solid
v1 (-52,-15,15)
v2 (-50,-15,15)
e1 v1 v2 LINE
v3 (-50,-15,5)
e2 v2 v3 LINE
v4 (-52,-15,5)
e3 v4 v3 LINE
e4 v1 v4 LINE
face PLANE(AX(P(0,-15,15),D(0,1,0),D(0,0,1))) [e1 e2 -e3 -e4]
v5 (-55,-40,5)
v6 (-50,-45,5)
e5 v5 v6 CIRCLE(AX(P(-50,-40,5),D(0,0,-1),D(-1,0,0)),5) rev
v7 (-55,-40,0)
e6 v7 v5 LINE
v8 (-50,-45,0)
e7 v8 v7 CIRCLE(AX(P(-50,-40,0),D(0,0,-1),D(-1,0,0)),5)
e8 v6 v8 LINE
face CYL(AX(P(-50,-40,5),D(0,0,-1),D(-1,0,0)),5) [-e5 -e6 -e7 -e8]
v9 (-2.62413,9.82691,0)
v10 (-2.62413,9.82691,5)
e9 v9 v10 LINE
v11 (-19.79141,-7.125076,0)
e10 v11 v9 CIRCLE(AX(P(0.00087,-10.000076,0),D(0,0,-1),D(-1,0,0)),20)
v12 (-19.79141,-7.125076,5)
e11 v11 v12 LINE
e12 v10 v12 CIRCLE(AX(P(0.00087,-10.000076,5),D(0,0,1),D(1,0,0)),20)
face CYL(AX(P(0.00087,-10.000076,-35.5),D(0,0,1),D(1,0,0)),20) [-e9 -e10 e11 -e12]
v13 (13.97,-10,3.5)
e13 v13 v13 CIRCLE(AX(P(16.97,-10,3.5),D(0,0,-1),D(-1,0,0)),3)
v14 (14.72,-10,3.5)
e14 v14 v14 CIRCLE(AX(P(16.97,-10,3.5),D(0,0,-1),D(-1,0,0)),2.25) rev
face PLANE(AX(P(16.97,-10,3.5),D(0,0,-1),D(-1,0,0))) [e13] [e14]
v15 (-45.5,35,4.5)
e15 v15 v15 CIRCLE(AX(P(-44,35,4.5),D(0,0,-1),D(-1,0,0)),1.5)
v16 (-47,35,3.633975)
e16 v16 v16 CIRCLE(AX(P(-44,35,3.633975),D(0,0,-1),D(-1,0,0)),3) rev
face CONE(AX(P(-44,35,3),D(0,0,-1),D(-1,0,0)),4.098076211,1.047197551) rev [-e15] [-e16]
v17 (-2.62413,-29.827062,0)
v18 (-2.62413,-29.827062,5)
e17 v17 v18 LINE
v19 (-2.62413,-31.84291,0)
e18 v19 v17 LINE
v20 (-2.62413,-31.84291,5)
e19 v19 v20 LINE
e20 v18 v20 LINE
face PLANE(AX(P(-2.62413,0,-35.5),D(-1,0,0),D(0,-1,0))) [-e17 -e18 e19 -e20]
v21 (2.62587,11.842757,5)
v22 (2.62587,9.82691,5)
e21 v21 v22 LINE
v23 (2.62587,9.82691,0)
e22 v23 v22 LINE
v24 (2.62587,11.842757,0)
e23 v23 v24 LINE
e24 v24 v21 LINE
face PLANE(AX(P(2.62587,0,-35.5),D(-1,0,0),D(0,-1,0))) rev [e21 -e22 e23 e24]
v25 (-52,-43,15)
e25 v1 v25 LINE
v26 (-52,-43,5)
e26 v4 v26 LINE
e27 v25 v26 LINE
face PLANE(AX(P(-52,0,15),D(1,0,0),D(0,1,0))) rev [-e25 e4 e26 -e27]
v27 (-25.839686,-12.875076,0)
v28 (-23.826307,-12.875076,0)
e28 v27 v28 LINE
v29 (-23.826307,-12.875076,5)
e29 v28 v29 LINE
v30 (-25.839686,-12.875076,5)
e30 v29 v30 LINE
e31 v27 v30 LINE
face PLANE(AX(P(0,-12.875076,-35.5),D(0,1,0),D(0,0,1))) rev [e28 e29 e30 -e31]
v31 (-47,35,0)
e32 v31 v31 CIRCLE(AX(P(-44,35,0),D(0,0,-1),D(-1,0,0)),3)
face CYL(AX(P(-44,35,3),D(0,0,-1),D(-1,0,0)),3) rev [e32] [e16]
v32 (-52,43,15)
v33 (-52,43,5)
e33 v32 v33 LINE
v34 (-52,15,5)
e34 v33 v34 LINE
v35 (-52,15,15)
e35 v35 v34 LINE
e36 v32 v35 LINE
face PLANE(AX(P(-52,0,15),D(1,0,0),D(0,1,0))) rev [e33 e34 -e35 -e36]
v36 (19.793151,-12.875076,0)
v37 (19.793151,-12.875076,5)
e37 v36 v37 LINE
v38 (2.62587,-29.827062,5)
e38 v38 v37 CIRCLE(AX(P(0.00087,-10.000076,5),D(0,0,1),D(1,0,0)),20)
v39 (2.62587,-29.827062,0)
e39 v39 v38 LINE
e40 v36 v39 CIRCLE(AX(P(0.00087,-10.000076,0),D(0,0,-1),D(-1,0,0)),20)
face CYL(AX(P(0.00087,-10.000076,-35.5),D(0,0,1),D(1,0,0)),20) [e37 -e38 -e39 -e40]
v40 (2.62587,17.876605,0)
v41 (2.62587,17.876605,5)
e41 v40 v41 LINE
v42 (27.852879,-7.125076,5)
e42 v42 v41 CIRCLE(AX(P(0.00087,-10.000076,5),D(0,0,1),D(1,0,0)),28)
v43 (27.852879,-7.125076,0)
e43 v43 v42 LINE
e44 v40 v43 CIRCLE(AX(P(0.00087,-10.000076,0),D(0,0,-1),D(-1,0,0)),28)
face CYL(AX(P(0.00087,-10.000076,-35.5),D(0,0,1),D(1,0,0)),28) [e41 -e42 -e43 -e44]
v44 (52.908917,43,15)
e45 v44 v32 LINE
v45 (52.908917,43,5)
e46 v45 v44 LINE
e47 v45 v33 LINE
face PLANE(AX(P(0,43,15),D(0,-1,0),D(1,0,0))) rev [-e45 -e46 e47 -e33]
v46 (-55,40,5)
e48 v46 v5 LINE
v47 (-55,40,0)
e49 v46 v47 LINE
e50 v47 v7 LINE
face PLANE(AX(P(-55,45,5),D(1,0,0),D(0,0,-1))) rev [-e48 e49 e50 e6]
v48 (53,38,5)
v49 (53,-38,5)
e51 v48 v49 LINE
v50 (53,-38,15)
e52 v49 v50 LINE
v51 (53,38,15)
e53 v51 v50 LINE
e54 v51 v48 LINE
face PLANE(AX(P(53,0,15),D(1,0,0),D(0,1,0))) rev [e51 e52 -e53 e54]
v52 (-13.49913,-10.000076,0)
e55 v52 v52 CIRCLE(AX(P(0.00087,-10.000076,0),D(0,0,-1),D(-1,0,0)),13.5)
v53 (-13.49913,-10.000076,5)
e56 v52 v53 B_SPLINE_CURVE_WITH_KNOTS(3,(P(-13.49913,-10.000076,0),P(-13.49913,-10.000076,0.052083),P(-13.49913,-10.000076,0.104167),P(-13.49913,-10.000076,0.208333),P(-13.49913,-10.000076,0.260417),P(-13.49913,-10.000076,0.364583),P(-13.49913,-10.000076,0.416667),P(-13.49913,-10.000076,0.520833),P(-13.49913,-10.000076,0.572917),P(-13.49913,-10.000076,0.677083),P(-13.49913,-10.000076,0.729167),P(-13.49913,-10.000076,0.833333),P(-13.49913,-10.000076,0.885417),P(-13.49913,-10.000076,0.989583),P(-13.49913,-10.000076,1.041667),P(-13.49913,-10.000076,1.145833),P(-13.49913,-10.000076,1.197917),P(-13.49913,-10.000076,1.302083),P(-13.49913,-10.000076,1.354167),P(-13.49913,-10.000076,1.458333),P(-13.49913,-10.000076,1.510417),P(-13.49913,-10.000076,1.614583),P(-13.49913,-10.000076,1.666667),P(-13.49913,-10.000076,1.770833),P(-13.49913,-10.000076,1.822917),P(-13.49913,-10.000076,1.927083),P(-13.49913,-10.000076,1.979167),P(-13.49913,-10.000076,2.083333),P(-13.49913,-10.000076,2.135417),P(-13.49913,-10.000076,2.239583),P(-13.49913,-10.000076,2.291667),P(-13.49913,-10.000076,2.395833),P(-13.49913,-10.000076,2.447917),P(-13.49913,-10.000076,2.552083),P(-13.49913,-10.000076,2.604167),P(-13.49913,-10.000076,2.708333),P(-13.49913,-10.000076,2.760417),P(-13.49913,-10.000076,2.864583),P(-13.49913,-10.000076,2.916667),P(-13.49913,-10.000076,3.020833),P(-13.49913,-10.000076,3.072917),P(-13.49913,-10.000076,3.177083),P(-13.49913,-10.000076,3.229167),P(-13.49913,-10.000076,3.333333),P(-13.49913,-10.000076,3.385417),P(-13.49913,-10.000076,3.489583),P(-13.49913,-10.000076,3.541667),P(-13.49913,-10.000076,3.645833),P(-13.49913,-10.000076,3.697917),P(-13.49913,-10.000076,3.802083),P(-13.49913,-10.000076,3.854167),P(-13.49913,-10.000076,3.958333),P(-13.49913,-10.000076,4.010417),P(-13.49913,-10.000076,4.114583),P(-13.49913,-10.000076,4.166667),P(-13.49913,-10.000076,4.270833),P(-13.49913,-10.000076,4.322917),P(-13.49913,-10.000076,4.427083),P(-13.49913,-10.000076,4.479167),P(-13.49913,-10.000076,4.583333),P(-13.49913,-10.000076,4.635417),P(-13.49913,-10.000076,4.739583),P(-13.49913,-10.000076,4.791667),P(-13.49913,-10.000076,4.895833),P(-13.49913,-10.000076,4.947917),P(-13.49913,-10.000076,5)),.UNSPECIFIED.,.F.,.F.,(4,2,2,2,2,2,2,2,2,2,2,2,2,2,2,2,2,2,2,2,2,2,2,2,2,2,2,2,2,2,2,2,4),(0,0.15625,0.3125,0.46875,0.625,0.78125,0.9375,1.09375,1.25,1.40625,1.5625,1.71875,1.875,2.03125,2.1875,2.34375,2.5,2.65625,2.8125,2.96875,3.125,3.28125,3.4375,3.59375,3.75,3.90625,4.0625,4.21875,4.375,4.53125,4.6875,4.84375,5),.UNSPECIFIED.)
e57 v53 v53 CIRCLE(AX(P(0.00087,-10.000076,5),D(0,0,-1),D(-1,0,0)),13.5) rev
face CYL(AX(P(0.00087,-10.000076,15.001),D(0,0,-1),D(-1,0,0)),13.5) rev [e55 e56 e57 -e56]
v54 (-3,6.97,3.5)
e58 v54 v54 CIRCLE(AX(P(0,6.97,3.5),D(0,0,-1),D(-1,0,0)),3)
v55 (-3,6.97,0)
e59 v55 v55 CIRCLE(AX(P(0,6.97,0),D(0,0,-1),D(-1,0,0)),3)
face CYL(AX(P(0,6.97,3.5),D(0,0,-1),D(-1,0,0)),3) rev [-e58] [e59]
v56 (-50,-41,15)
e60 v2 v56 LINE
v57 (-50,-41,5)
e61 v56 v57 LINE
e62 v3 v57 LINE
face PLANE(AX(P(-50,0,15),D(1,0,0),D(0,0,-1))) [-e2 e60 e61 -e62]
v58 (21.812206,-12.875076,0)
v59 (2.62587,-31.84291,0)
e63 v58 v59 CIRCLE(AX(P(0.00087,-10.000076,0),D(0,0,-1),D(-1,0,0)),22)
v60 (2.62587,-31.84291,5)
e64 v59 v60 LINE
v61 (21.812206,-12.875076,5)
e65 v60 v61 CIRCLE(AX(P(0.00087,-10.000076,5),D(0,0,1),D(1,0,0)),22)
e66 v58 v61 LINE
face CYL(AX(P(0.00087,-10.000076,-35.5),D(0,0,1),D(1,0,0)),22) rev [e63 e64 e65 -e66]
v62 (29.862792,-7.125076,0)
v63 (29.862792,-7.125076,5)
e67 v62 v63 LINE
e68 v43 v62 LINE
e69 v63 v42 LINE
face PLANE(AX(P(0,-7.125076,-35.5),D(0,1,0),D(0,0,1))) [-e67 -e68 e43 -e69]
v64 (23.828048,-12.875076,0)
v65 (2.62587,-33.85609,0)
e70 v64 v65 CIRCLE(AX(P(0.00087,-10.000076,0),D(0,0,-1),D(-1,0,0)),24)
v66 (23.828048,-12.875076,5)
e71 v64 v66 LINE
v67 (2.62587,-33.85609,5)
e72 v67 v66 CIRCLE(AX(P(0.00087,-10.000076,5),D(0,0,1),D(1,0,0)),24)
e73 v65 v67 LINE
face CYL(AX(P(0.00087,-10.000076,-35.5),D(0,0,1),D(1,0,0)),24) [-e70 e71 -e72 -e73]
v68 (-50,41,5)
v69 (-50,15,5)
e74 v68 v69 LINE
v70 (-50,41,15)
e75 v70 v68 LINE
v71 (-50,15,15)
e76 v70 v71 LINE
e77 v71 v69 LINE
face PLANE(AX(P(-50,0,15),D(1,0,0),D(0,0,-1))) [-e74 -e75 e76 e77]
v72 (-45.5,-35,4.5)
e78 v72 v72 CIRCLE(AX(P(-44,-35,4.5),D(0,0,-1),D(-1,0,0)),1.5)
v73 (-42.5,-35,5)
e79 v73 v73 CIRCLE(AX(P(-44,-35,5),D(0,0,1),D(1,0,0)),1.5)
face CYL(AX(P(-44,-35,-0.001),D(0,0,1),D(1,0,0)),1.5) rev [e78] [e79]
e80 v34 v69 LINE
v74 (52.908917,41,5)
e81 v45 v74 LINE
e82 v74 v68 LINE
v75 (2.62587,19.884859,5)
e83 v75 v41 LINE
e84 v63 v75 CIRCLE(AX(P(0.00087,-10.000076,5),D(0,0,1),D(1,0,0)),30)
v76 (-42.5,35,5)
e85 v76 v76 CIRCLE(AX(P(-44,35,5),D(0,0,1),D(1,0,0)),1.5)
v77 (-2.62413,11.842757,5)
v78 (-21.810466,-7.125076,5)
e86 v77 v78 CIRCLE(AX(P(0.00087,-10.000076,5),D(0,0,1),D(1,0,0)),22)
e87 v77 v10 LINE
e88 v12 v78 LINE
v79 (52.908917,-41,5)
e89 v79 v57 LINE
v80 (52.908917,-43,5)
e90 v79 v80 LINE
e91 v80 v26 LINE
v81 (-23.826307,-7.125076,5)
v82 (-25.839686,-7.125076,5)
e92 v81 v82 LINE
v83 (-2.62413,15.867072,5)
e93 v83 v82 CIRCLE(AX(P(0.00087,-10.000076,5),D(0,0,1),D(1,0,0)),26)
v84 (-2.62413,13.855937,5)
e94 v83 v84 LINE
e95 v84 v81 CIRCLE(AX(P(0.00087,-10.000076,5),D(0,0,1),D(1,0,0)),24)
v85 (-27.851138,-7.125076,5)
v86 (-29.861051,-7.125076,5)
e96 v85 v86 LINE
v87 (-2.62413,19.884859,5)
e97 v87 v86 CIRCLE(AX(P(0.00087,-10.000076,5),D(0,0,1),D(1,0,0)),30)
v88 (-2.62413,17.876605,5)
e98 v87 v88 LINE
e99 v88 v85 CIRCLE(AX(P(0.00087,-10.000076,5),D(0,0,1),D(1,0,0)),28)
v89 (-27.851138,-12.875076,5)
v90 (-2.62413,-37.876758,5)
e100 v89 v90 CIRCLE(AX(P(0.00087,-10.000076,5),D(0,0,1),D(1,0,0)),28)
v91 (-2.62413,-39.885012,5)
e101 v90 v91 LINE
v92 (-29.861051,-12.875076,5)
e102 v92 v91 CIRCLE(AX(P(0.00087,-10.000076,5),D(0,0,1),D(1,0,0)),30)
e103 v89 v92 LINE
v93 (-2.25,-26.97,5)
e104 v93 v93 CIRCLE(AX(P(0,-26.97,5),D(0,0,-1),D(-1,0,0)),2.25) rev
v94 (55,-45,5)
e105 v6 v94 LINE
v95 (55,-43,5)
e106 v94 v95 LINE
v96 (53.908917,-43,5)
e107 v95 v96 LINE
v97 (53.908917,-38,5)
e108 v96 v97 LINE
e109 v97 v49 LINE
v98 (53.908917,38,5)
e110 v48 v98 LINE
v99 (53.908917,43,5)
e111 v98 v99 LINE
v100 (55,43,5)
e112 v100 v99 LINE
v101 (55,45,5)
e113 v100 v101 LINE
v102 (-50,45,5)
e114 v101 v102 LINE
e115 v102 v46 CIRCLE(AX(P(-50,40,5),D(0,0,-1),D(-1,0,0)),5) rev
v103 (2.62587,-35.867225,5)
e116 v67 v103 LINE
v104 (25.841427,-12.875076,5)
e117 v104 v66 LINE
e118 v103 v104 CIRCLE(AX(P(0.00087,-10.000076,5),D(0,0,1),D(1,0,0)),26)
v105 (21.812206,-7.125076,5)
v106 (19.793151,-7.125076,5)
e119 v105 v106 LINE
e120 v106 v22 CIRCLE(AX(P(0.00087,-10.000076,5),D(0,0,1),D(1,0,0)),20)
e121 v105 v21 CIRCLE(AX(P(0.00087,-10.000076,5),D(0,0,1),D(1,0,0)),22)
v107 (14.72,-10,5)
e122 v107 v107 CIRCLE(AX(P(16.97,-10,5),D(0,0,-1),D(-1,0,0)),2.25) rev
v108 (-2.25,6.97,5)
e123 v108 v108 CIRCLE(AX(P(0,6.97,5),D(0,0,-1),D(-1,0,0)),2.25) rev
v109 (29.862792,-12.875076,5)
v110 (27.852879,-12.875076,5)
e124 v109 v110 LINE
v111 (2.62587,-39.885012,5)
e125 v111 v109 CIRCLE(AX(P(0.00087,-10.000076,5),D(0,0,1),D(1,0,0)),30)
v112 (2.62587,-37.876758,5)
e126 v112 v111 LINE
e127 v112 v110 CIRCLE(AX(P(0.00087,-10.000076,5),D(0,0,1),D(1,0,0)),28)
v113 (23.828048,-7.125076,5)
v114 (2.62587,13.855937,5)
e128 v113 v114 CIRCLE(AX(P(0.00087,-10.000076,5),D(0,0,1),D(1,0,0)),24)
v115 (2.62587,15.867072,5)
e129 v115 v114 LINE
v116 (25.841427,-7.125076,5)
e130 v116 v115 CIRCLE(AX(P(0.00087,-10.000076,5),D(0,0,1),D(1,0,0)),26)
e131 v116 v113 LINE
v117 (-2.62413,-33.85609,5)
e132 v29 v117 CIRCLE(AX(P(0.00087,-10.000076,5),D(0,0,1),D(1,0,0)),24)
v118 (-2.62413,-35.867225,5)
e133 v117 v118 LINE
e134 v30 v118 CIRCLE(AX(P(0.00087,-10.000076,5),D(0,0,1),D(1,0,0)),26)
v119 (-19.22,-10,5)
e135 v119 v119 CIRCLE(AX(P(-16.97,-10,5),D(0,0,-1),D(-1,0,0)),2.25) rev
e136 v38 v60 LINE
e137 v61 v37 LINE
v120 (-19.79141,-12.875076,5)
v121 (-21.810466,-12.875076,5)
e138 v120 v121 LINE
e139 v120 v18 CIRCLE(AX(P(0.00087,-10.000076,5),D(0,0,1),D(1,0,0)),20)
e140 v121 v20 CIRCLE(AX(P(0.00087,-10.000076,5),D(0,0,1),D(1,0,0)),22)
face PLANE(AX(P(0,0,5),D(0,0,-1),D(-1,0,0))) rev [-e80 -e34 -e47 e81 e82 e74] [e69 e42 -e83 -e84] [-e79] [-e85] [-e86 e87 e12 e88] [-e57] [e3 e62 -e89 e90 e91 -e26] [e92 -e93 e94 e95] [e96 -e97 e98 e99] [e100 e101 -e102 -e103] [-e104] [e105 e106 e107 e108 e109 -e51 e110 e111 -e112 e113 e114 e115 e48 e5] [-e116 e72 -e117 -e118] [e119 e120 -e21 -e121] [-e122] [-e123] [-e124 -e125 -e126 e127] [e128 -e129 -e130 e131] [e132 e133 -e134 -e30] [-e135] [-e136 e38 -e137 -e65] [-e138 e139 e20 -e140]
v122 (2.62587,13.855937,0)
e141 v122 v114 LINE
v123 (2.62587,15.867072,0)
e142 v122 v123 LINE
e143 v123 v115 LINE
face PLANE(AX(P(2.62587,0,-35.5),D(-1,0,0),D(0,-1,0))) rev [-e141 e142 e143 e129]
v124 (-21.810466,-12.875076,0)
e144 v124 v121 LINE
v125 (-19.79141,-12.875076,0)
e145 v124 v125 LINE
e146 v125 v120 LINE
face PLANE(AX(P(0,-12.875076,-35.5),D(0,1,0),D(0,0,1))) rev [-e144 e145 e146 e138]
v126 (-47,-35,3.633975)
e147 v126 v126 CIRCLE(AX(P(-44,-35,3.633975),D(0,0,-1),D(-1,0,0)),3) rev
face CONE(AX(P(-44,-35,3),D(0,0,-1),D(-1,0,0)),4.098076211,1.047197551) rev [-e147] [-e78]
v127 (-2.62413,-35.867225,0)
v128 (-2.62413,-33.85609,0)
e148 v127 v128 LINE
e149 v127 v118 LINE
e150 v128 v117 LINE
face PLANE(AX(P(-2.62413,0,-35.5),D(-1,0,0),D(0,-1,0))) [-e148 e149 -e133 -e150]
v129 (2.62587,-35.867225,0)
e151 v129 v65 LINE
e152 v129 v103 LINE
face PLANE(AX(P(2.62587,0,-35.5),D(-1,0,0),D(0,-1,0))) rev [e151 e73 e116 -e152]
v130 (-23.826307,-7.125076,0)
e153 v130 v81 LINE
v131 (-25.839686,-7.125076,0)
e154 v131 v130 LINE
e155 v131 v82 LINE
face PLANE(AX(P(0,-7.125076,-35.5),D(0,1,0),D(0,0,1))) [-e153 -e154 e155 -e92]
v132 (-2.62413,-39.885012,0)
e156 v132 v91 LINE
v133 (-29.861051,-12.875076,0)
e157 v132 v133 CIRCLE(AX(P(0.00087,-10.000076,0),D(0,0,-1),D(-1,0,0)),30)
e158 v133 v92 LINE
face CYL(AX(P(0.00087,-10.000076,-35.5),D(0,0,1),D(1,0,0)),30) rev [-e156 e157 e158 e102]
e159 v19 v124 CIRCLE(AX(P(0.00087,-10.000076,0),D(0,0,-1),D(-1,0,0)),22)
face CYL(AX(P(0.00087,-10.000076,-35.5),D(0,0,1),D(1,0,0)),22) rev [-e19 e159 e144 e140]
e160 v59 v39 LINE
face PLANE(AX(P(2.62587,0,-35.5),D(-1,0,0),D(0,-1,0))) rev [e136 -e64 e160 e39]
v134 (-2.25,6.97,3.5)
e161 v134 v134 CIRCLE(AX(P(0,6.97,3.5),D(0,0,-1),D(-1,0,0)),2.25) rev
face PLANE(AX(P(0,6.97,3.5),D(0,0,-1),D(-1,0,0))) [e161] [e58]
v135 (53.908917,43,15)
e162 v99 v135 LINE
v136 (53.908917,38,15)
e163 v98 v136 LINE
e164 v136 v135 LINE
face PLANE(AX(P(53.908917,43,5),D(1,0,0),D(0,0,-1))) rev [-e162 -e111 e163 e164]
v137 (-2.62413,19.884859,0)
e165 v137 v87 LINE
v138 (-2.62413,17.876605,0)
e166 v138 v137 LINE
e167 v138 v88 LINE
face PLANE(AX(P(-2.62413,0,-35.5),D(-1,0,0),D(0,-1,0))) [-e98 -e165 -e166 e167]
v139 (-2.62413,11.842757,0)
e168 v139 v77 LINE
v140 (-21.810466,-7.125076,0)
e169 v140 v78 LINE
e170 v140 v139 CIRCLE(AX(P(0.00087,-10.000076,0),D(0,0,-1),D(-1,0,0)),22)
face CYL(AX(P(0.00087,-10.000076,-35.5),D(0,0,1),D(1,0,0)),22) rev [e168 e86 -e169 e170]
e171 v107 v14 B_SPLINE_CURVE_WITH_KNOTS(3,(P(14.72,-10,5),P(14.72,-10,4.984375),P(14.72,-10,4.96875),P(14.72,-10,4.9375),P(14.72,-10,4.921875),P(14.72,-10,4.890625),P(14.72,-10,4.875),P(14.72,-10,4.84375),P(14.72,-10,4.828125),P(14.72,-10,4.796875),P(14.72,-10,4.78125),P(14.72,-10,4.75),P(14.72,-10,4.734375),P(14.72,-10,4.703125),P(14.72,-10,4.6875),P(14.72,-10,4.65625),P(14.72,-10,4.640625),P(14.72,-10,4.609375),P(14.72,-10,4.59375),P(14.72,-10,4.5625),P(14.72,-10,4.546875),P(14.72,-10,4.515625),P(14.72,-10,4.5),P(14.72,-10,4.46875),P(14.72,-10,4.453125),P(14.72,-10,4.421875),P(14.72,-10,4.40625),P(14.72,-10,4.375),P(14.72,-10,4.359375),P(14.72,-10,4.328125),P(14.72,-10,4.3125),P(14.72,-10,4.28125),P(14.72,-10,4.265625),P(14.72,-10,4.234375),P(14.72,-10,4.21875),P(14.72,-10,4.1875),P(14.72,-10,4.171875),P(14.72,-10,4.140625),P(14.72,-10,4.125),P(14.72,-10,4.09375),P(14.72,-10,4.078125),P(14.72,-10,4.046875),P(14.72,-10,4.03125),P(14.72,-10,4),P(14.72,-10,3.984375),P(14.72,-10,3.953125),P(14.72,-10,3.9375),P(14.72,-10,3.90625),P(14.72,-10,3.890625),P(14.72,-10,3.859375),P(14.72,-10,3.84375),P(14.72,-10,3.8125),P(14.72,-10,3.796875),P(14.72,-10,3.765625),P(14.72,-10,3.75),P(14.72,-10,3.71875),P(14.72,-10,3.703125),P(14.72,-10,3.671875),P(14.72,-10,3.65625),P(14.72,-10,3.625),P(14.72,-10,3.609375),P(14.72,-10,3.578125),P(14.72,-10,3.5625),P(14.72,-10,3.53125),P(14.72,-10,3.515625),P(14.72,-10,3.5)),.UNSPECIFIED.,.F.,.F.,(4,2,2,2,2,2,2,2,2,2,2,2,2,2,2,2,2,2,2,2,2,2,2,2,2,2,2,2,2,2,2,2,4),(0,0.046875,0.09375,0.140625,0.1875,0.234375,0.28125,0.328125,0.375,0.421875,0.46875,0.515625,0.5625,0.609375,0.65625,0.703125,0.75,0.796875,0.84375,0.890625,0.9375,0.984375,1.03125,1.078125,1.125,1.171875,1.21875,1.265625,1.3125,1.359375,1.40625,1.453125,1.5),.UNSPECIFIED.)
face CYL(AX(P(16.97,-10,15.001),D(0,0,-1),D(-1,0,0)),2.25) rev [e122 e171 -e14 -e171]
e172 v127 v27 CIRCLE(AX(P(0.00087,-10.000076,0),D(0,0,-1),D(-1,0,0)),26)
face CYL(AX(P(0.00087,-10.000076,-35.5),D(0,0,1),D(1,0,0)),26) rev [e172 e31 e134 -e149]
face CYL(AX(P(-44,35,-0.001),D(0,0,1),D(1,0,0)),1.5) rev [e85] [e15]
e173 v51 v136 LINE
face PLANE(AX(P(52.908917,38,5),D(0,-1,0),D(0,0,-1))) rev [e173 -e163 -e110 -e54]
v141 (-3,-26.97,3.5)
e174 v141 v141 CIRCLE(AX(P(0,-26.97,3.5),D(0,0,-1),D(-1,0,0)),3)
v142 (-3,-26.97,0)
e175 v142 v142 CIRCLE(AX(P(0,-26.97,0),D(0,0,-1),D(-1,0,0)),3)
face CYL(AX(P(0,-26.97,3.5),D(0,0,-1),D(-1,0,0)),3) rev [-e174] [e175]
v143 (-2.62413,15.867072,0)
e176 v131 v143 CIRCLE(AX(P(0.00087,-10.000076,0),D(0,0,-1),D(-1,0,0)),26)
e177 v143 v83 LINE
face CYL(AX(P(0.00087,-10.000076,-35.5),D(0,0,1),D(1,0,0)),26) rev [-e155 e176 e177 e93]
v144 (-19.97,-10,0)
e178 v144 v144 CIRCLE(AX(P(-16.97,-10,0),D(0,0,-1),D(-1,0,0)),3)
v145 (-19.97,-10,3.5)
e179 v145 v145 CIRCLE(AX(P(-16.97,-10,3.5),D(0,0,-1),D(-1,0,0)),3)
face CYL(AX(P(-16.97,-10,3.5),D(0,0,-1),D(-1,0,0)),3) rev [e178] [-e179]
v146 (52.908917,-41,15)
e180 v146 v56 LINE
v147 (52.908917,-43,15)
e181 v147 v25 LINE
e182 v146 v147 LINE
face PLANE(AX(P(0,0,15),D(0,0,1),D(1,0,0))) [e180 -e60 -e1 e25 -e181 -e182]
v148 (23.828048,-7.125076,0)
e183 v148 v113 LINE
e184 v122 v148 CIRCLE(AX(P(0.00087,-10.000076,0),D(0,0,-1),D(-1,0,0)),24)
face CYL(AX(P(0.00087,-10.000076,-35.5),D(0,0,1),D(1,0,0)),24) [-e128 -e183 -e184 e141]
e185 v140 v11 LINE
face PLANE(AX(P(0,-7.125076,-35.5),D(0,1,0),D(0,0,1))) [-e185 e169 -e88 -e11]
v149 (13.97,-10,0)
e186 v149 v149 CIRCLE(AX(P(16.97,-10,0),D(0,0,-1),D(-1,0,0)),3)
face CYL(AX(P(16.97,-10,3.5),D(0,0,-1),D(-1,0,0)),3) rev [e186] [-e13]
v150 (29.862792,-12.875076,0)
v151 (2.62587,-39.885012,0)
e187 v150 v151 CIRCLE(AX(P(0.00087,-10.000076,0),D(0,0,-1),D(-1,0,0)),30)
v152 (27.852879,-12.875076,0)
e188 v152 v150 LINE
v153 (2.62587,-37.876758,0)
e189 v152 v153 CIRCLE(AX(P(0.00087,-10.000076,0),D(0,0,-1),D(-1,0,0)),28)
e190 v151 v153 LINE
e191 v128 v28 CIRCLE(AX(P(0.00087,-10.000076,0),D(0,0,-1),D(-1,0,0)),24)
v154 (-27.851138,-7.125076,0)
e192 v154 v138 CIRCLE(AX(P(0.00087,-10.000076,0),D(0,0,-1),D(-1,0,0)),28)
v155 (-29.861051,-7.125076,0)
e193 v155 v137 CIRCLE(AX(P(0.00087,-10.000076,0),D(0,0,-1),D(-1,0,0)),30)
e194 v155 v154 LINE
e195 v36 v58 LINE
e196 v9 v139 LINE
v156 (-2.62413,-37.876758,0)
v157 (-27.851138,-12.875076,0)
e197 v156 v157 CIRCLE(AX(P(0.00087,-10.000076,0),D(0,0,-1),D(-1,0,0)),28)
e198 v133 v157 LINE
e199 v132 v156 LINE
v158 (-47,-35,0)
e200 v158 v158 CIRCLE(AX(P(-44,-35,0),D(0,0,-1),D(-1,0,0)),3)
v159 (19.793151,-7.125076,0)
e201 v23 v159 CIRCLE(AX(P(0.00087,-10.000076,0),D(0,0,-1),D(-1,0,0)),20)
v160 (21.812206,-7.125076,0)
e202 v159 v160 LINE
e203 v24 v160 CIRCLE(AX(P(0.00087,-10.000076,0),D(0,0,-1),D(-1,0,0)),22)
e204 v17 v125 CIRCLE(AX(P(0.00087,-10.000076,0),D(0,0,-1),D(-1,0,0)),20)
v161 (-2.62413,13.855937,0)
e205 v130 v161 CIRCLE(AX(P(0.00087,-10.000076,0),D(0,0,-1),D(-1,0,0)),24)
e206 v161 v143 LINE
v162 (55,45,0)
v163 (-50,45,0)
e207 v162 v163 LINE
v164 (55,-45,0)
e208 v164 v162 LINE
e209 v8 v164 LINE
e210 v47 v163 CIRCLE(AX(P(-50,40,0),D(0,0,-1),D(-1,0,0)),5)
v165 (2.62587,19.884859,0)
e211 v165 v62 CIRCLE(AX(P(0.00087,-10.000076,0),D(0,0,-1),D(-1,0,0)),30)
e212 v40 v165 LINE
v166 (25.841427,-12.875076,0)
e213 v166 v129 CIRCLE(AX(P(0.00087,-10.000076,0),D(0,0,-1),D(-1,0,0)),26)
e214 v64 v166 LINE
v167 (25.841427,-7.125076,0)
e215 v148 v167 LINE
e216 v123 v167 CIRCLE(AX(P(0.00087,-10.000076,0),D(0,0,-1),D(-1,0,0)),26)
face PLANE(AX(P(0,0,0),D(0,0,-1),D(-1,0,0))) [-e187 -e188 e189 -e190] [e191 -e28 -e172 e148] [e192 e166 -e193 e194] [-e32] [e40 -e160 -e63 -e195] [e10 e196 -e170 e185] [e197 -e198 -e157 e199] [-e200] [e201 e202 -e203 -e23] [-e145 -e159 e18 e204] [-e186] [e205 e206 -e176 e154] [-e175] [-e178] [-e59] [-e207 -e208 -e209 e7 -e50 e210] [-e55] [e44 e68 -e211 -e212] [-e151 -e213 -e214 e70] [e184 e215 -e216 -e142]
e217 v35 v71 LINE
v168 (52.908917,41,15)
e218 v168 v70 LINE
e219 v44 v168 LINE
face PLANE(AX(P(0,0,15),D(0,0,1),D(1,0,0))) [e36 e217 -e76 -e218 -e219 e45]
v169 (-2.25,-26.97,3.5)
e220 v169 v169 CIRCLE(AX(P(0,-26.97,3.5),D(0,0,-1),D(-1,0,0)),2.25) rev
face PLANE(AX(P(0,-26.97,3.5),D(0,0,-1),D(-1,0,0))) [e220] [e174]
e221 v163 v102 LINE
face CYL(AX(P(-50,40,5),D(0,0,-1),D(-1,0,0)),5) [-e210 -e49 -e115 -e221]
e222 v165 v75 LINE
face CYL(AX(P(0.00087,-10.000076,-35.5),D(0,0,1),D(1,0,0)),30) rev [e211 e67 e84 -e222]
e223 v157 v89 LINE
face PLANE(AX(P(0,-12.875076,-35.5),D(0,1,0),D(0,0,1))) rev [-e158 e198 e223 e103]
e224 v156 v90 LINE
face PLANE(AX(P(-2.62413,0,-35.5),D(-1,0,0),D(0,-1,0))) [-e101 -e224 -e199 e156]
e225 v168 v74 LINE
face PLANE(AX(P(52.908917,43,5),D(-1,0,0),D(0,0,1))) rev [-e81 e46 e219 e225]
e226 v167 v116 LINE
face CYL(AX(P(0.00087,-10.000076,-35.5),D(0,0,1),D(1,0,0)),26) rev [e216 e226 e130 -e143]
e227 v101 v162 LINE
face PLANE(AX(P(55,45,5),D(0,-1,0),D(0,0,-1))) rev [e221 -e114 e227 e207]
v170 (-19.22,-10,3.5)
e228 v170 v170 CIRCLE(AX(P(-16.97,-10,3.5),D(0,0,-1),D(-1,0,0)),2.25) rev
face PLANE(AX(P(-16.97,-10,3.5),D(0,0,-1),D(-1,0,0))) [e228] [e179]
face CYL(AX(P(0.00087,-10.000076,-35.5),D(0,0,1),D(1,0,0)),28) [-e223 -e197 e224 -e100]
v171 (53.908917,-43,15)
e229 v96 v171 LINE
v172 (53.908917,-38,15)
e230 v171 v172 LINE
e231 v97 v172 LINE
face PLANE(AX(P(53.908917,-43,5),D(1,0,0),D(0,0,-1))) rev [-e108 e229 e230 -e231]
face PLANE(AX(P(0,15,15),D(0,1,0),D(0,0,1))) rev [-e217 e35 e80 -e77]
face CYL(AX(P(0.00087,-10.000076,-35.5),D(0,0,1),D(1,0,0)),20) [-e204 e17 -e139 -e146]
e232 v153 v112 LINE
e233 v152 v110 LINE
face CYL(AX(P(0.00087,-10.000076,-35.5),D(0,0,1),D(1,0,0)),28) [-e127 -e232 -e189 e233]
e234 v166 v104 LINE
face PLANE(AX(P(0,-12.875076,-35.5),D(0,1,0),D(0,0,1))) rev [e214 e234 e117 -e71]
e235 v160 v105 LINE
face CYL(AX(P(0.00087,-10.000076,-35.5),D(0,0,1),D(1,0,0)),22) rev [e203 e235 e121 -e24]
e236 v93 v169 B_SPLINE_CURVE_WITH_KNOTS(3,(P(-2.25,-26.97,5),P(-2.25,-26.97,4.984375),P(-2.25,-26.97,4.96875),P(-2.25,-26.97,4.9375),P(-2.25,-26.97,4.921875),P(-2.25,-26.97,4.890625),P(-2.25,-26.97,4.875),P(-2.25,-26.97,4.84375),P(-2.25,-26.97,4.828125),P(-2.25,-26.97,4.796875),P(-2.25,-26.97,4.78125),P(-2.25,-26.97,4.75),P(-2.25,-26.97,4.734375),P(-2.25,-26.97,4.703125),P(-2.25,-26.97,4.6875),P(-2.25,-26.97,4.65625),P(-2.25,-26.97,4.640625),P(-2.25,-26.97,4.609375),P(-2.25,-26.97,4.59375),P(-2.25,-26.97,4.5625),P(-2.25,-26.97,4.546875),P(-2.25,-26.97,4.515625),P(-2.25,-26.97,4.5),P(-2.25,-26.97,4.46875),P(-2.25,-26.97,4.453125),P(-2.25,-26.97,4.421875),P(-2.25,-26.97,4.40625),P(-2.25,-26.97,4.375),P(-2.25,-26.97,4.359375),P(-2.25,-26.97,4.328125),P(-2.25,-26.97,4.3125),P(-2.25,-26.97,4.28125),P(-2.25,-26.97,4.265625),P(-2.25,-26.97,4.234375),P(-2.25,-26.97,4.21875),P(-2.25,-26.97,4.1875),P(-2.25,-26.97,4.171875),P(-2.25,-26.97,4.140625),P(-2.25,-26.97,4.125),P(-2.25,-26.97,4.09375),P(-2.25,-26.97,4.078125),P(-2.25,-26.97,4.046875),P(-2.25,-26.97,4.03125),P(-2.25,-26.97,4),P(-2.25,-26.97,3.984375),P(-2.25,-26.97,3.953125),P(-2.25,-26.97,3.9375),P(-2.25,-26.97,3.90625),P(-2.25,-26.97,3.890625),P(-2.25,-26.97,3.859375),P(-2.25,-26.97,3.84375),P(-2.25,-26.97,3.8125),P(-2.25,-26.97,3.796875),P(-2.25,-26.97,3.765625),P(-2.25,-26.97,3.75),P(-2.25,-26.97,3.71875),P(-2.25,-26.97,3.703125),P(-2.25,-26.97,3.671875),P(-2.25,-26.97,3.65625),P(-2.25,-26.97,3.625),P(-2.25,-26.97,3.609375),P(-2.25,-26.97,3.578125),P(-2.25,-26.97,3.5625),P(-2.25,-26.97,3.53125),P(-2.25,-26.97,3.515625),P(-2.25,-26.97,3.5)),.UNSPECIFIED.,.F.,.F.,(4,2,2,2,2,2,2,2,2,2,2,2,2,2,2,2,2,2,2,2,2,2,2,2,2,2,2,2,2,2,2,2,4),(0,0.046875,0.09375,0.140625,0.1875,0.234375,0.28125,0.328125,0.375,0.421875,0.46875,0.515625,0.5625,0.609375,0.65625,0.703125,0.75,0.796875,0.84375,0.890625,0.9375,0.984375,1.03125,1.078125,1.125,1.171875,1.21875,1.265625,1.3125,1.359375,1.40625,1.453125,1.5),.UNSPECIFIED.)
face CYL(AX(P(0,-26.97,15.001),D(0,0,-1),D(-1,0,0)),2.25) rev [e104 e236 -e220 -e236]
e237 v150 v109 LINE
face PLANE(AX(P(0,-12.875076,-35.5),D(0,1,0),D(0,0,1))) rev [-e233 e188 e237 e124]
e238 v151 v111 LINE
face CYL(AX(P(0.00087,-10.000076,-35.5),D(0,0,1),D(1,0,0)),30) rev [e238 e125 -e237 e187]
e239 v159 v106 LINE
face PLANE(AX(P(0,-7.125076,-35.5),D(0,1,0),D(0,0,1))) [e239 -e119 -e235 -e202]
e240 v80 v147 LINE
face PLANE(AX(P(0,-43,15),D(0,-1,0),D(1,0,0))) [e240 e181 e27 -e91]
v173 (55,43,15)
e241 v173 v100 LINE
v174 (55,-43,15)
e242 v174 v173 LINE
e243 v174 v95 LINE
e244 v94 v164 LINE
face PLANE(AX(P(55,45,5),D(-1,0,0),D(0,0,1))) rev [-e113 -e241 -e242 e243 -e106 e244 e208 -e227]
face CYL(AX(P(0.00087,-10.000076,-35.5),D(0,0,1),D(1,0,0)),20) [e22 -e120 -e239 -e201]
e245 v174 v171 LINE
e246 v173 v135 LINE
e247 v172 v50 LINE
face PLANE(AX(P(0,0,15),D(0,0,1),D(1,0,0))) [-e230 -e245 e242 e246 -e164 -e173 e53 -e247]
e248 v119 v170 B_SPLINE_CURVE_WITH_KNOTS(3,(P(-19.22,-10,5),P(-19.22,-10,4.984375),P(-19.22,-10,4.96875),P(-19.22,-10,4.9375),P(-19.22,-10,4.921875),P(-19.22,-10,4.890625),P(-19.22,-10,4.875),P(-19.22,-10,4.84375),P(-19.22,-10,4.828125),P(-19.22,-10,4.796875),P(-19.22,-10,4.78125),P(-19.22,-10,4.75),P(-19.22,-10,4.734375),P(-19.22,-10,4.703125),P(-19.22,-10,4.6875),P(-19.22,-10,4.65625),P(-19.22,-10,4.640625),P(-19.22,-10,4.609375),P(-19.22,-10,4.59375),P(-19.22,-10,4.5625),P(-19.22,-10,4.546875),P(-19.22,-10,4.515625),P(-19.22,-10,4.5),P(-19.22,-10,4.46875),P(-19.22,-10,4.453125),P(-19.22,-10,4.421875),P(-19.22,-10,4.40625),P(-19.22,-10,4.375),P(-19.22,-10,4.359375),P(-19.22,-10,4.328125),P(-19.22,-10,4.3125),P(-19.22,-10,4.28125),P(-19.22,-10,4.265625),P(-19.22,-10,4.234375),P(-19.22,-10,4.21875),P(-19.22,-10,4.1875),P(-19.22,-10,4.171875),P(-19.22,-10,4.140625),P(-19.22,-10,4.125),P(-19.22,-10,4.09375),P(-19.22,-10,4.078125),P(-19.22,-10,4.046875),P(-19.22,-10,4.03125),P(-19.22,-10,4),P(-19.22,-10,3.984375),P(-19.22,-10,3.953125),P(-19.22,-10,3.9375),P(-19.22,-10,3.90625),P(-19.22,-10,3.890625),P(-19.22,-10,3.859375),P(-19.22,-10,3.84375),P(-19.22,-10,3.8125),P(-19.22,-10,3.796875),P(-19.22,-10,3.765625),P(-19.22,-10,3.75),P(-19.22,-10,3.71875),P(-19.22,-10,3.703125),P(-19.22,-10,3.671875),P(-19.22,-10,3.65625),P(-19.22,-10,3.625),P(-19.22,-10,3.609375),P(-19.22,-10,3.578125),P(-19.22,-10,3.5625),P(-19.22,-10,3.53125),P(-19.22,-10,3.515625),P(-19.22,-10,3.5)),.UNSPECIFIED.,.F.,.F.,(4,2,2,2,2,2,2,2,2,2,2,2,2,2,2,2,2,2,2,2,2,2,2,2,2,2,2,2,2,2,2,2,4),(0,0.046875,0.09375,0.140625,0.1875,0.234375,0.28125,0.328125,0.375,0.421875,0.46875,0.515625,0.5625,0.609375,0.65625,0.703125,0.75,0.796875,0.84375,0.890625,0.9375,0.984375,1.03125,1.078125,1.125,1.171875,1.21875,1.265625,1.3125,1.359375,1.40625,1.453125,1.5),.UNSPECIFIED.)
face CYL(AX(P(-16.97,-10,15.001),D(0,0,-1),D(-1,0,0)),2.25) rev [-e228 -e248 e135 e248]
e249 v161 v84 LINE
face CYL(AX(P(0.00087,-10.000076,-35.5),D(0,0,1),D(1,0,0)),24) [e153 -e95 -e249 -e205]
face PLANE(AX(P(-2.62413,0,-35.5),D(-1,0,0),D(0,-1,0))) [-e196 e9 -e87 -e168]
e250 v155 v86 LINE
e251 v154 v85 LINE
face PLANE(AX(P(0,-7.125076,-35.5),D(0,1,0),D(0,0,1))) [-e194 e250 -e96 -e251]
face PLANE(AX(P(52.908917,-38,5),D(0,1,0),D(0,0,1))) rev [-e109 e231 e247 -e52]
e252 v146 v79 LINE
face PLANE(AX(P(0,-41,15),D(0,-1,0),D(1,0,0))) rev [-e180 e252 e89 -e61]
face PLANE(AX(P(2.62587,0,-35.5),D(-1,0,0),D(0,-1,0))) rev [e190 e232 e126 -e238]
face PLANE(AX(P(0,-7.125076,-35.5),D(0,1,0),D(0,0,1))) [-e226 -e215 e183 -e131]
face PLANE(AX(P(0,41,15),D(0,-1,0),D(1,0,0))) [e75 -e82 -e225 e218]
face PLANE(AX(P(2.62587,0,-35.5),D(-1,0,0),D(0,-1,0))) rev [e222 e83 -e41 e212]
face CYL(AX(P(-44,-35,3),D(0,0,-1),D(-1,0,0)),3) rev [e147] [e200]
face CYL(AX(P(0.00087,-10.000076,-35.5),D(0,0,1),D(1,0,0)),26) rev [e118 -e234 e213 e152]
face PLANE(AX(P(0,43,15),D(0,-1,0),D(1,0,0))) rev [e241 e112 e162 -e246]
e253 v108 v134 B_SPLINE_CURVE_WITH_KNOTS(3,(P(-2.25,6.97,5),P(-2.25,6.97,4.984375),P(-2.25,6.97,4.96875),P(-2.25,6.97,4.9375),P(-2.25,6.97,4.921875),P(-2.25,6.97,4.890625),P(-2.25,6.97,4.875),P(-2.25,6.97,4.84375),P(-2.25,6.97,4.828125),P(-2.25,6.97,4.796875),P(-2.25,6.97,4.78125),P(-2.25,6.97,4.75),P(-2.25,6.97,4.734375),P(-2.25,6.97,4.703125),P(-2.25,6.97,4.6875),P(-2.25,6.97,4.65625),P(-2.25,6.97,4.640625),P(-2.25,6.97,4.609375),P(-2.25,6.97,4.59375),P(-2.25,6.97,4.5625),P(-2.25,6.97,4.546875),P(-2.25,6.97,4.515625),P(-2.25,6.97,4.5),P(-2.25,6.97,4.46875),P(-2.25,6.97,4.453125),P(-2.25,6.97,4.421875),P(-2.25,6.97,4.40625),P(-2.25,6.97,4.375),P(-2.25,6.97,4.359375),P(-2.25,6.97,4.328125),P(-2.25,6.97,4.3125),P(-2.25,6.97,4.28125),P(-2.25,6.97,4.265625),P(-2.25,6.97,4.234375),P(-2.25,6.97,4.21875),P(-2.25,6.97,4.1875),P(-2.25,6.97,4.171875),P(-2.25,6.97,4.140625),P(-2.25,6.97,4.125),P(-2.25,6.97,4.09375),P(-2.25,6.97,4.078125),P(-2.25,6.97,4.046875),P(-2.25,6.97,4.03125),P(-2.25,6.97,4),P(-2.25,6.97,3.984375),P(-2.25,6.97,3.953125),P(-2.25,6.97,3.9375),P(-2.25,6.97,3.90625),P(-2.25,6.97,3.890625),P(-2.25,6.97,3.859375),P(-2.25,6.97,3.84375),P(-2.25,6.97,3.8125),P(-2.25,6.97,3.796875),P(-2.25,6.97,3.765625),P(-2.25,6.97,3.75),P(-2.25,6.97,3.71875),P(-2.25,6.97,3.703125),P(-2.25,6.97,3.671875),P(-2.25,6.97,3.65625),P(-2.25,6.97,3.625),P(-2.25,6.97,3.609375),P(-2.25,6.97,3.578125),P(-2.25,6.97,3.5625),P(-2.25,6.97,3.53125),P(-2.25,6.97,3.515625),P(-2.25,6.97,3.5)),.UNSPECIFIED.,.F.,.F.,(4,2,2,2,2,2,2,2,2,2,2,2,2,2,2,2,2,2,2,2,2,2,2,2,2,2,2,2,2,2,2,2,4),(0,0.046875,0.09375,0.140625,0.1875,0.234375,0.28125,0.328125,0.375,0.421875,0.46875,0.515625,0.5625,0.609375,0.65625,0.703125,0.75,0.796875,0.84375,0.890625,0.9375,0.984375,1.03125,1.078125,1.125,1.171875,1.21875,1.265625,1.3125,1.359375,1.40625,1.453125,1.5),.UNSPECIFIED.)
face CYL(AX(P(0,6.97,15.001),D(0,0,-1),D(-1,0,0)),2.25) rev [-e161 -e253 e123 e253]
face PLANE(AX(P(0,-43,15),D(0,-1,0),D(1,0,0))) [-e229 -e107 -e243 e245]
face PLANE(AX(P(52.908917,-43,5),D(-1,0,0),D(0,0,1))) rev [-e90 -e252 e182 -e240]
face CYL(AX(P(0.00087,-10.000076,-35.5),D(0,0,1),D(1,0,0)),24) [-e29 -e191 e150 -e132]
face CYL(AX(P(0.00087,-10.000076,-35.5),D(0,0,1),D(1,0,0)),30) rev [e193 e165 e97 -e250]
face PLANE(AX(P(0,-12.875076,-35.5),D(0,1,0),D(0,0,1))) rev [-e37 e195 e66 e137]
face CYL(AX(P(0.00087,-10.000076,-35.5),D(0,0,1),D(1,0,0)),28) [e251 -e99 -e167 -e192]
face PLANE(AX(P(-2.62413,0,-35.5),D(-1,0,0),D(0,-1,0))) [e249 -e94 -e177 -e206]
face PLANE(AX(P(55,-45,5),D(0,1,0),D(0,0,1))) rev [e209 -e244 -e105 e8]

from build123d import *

# Parameters (mm, degrees)
SKETCH1_W           = 110
SKETCH1_H           = 90
BOSS_EXTRUDE1_DEPTH = 5
CUT_EXTRUDE5_REACH  = 73.239
SKETCH6_R           = 1.5
SKETCH7_R           = 3
CUT_EXTRUDE6_DEPTH  = 3
FILLET2_R           = 5
BOSS_EXTRUDE2_DEPTH = 10
CHAMFER1_SIZE       = 1.5
CHAMFER1_SIZE_2     = 2.598076211
CHAMFER2_SIZE       = 1.5
CHAMFER2_SIZE_2     = 2.598076211
CUT_EXTRUDE7_REACH  = 74.629
SKETCH14_R          = 2.25
SKETCH15_R          = 3
CUT_EXTRUDE8_DEPTH  = 3.5
SKETCH16_W          = 5.25
SKETCH16_H          = 5.75
CUT_EXTRUDE9_DEPTH  = 40.5
CUT_EXTRUDE10_REACH = 74.629
SKETCH17_R          = 13.5
SKETCH18_W          = 1
SKETCH18_H          = 5
CUT_EXTRUDE11_DEPTH = 10


with BuildPart() as part:
    # Sketch1 → Boss-Extrude1 (new body)
    with BuildSketch(Plane.XY):
        Rectangle(SKETCH1_W, SKETCH1_H)
    extrude(amount=BOSS_EXTRUDE1_DEPTH)

    # Sketch6 → Cut-Extrude5 (cut, up to next)
    with BuildSketch(Plane.XY.offset(5), mode=Mode.PRIVATE) as cut_extrude5_sk1:
        with Locations((-44, 35)):
            Circle(SKETCH6_R)
    cut_extrude5_tool1 = extrude(cut_extrude5_sk1.sketch, amount=-CUT_EXTRUDE5_REACH, mode=Mode.PRIVATE) & part.part
    # Sketch6 → Cut-Extrude5 (cut, up to next)
    with BuildSketch(Plane.XY.offset(5), mode=Mode.PRIVATE) as cut_extrude5_sk2:
        with Locations((-44, -35)):
            Circle(SKETCH6_R)
    cut_extrude5_tool2 = extrude(cut_extrude5_sk2.sketch, amount=-CUT_EXTRUDE5_REACH, mode=Mode.PRIVATE) & part.part
    add(cut_extrude5_tool1.solids().sort_by_distance((-44, 35, 5))[0], mode=Mode.SUBTRACT)
    add(cut_extrude5_tool2.solids().sort_by_distance((-44, -35, 5))[0], mode=Mode.SUBTRACT)

    # Sketch7 → Cut-Extrude6 (cut)
    with BuildSketch(Plane(origin=(0, 0, 0), x_dir=(-1, 0, 0), z_dir=(0, 0, -1))):
        with Locations((44, 35)):
            Circle(SKETCH7_R)
        with Locations((44, -35)):
            Circle(SKETCH7_R)
    extrude(amount=-CUT_EXTRUDE6_DEPTH, mode=Mode.SUBTRACT)

    # Fillet2
    fillet2_edges = [part.edges().sort_by_distance(p)[0] for p in [
        (-55, 45, 2.5),
        (-55, -45, 2.5),
    ]]
    fillet(fillet2_edges, radius=FILLET2_R)

    # Sketch12 → Boss-Extrude2 (add)
    with BuildSketch(Plane.XY.offset(5)):
        Polygon((-52, -43), (55, -43), (55, 43), (-52, 43), (-52, 15), (-50, 15), (-50, 41), (53, 41), (53, -41), (-50, -41), (-50, -15), (-52, -15), align=None)
    extrude(amount=BOSS_EXTRUDE2_DEPTH)

    # Chamfer1
    # the kernel refuses this chamfer: 2.598076211, 1.5 mm, written as the material it takes off along each edge
    with BuildSketch(Plane(origin=(-44, 35, 3), x_dir=(1, 0, 0), z_dir=(0, -1, 0))) as chamfer1_piece_1_section:
        Polygon((1.5, CHAMFER1_SIZE), (1.5 + CHAMFER1_SIZE_2, 0), (1.5, 0), align=None)
    chamfer1_piece_1 = revolve(axis=Axis((-44, 35, 3), (0, 0, 1)), mode=Mode.PRIVATE)
    chamfer1_piece_1 = chamfer1_piece_1 & Plane(origin=(-44, 35, 4.068135077), x_dir=(-1, 0, 0), z_dir=(0, 0, -1)) * Cylinder(3, 17, mode=Mode.PRIVATE)
    add(chamfer1_piece_1, mode=Mode.SUBTRACT)

    # Chamfer2
    # the kernel refuses this chamfer: 2.598076211, 1.5 mm, written as the material it takes off along each edge
    with BuildSketch(Plane(origin=(-44, -35, 3), x_dir=(1, 0, 0), z_dir=(0, -1, 0))) as chamfer2_piece_1_section:
        Polygon((1.5, CHAMFER2_SIZE), (1.5 + CHAMFER2_SIZE_2, 0), (1.5, 0), align=None)
    chamfer2_piece_1 = revolve(axis=Axis((-44, -35, 3), (0, 0, 1)), mode=Mode.PRIVATE)
    chamfer2_piece_1 = chamfer2_piece_1 & Plane(origin=(-44, -35, 4.068135077), x_dir=(-1, 0, 0), z_dir=(0, 0, -1)) * Cylinder(3, 17, mode=Mode.PRIVATE)
    add(chamfer2_piece_1, mode=Mode.SUBTRACT)

    # Sketch14 → Cut-Extrude7 (cut, up to next)
    with BuildSketch(Plane(origin=(0, 0, 0), x_dir=(-1, 0, 0), z_dir=(0, 0, -1)), mode=Mode.PRIVATE) as cut_extrude7_sk1:
        with Locations((0, 6.97)):
            Circle(SKETCH14_R)
    cut_extrude7_tool1 = extrude(cut_extrude7_sk1.sketch, amount=-CUT_EXTRUDE7_REACH, mode=Mode.PRIVATE) & part.part
    # Sketch14 → Cut-Extrude7 (cut, up to next)
    with BuildSketch(Plane(origin=(0, 0, 0), x_dir=(-1, 0, 0), z_dir=(0, 0, -1)), mode=Mode.PRIVATE) as cut_extrude7_sk2:
        with Locations((16.97, -10)):
            Circle(SKETCH14_R)
    cut_extrude7_tool2 = extrude(cut_extrude7_sk2.sketch, amount=-CUT_EXTRUDE7_REACH, mode=Mode.PRIVATE) & part.part
    # Sketch14 → Cut-Extrude7 (cut, up to next)
    with BuildSketch(Plane(origin=(0, 0, 0), x_dir=(-1, 0, 0), z_dir=(0, 0, -1)), mode=Mode.PRIVATE) as cut_extrude7_sk3:
        with Locations((0, -26.97)):
            Circle(SKETCH14_R)
    cut_extrude7_tool3 = extrude(cut_extrude7_sk3.sketch, amount=-CUT_EXTRUDE7_REACH, mode=Mode.PRIVATE) & part.part
    # Sketch14 → Cut-Extrude7 (cut, up to next)
    with BuildSketch(Plane(origin=(0, 0, 0), x_dir=(-1, 0, 0), z_dir=(0, 0, -1)), mode=Mode.PRIVATE) as cut_extrude7_sk4:
        with Locations((-16.97, -10)):
            Circle(SKETCH14_R)
    cut_extrude7_tool4 = extrude(cut_extrude7_sk4.sketch, amount=-CUT_EXTRUDE7_REACH, mode=Mode.PRIVATE) & part.part
    add(cut_extrude7_tool1.solids().sort_by_distance((0, 6.97, 0))[0], mode=Mode.SUBTRACT)
    add(cut_extrude7_tool2.solids().sort_by_distance((-16.97, -10, 0))[0], mode=Mode.SUBTRACT)
    add(cut_extrude7_tool3.solids().sort_by_distance((0, -26.97, 0))[0], mode=Mode.SUBTRACT)
    add(cut_extrude7_tool4.solids().sort_by_distance((16.97, -10, 0))[0], mode=Mode.SUBTRACT)

    # Sketch15 → Cut-Extrude8 (cut)
    with BuildSketch(Plane(origin=(0, 0, 0), x_dir=(-1, 0, 0), z_dir=(0, 0, -1))):
        with Locations((0, 6.97)):
            Circle(SKETCH15_R)
        with Locations((0, -26.97)):
            Circle(SKETCH15_R)
        with Locations((-16.97, -10)):
            Circle(SKETCH15_R)
        with Locations((16.97, -10)):
            Circle(SKETCH15_R)
    extrude(amount=-CUT_EXTRUDE8_DEPTH, mode=Mode.SUBTRACT)

    # Sketch16 → Cut-Extrude9 (cut)
    with BuildSketch(Plane.XY.offset(5)):
        with BuildLine():
            ThreePointArc((12.165753201, -7.125076435), (8.748632168, -1.071097601), (2.625870341, 2.221190888))
            Line((2.625870341, 2.221190888), (2.625870341, -2.36365057))
            ThreePointArc((2.625870341, -2.36365057), (5.615974196, -4.196953681), (7.546730133, -7.125076435))
            Line((7.546730133, -7.125076435), (12.165753201, -7.125076435))
        make_face()
        with BuildLine():
            ThreePointArc((12.500870341, -10.000076435), (12.4168084, -8.552843861), (12.165753201, -7.125076435))
            Line((12.165753201, -7.125076435), (7.546730133, -7.125076435))
            ThreePointArc((7.546730133, -7.125076435), (7.942483616, -8.538432296), (8.075870341, -10.000076435))
            ThreePointArc((8.075870341, -10.000076435), (7.942483616, -11.461720575), (7.546730133, -12.875076435))
            Line((7.546730133, -12.875076435), (12.165753201, -12.875076435))
            ThreePointArc((12.165753201, -12.875076435), (12.4168084, -11.44730901), (12.500870341, -10.000076435))
        make_face()
        with BuildLine():
            Line((-7.544989451, -7.125076435), (-12.164012519, -7.125076435))
            ThreePointArc((-12.164012519, -7.125076435), (-12.499129659, -10.000076435), (-12.164012519, -12.875076435))
            Line((-12.164012519, -12.875076435), (-7.544989451, -12.875076435))
            ThreePointArc((-7.544989451, -12.875076435), (-8.074129659, -10.000076435), (-7.544989451, -7.125076435))
        make_face()
        with BuildLine():
            Line((-7.544989451, -12.875076435), (-12.164012519, -12.875076435))
            ThreePointArc((-12.164012519, -12.875076435), (-8.746891485, -18.92905527), (-2.624129659, -22.221343759))
            Line((-2.624129659, -22.221343759), (-2.624129659, -17.636502301))
            ThreePointArc((-2.624129659, -17.636502301), (-5.614233513, -15.80319919), (-7.544989451, -12.875076435))
        make_face()
        with BuildLine():
            Line((-2.624129659, -2.36365057), (-2.624129659, 2.221190888))
            ThreePointArc((-2.624129659, 2.221190888), (-8.746891485, -1.071097601), (-12.164012519, -7.125076435))
            Line((-12.164012519, -7.125076435), (-7.544989451, -7.125076435))
            ThreePointArc((-7.544989451, -7.125076435), (-5.614233513, -4.196953681), (-2.624129659, -2.36365057))
        make_face()
        with BuildLine():
            Line((-2.624129659, 9.826909594), (-2.624129659, 11.842757058))
            ThreePointArc((-2.624129659, 11.842757058), (-15.46613665, 5.645104763), (-21.810465587, -7.125076435))
            Line((-21.810465587, -7.125076435), (-19.791410351, -7.125076435))
            ThreePointArc((-19.791410351, -7.125076435), (-14.051747777, 4.231013615), (-2.624129659, 9.826909594))
        make_face()
        with BuildLine():
            Line((-2.624129659, 13.855936958), (-2.624129659, 15.867072132))
            ThreePointArc((-2.624129659, 15.867072132), (-18.29480414, 8.473371951), (-25.839686444, -7.125076435))
            Line((-25.839686444, -7.125076435), (-23.826306894, -7.125076435))
            ThreePointArc((-23.826306894, -7.125076435), (-16.880484784, 7.059227452), (-2.624129659, 13.855936958))
        make_face()
        with BuildLine():
            Line((-2.624129659, 17.876605128), (-2.624129659, 19.884859151))
            ThreePointArc((-2.624129659, 19.884859151), (-21.123385326, 11.301703362), (-29.861051482, -7.125076435))
            Line((-29.861051482, -7.125076435), (-27.851138114, -7.125076435))
            ThreePointArc((-27.851138114, -7.125076435), (-19.709102549, 9.887531984), (-2.624129659, 17.876605128))
        make_face()
        with BuildLine():
            ThreePointArc((21.81220627, -7.125076435), (15.467877332, 5.645104763), (2.625870341, 11.842757058))
            Line((2.625870341, 11.842757058), (2.625870341, 9.826909594))
            ThreePointArc((2.625870341, 9.826909594), (14.05348846, 4.231013615), (19.793151034, -7.125076435))
            Line((19.793151034, -7.125076435), (21.81220627, -7.125076435))
        make_face()
        with BuildLine():
            ThreePointArc((25.841427127, -7.125076435), (18.296544822, 8.473371951), (2.625870341, 15.867072132))
            Line((2.625870341, 15.867072132), (2.625870341, 13.855936958))
            ThreePointArc((2.625870341, 13.855936958), (16.882225467, 7.059227452), (23.828047577, -7.125076435))
            Line((23.828047577, -7.125076435), (25.841427127, -7.125076435))
        make_face()
        with BuildLine():
            ThreePointArc((29.862792165, -7.125076435), (21.125126008, 11.301703362), (2.625870341, 19.884859151))
            Line((2.625870341, 19.884859151), (2.625870341, 17.876605128))
            ThreePointArc((2.625870341, 17.876605128), (19.710843232, 9.887531984), (27.852878797, -7.125076435))
            Line((27.852878797, -7.125076435), (29.862792165, -7.125076435))
        make_face()
        with BuildLine():
            ThreePointArc((2.625870341, -31.842909928), (15.467877332, -25.645257634), (21.81220627, -12.875076435))
            Line((21.81220627, -12.875076435), (19.793151034, -12.875076435))
            ThreePointArc((19.793151034, -12.875076435), (14.05348846, -24.231166485), (2.625870341, -29.827062464))
            Line((2.625870341, -29.827062464), (2.625870341, -31.842909928))
        make_face()
        with BuildLine():
            ThreePointArc((2.625870341, -35.867225003), (18.296544822, -28.473524822), (25.841427127, -12.875076435))
            Line((25.841427127, -12.875076435), (23.828047577, -12.875076435))
            ThreePointArc((23.828047577, -12.875076435), (16.882225467, -27.059380323), (2.625870341, -33.856089828))
            Line((2.625870341, -33.856089828), (2.625870341, -35.867225003))
        make_face()
        with BuildLine():
            Line((29.862792165, -12.875076435), (27.852878797, -12.875076435))
            ThreePointArc((27.852878797, -12.875076435), (19.710843232, -29.887684855), (2.625870341, -37.876757999))
            Line((2.625870341, -37.876757999), (2.625870341, -39.885012022))
            ThreePointArc((2.625870341, -39.885012022), (21.125126008, -31.301856232), (29.862792165, -12.875076435))
        make_face()
        with BuildLine():
            Line((-27.851138114, -12.875076435), (-29.861051482, -12.875076435))
            ThreePointArc((-29.861051482, -12.875076435), (-21.123385326, -31.301856232), (-2.624129659, -39.885012022))
            Line((-2.624129659, -39.885012022), (-2.624129659, -37.876757999))
            ThreePointArc((-2.624129659, -37.876757999), (-19.709102549, -29.887684855), (-27.851138114, -12.875076435))
        make_face()
        with BuildLine():
            Line((-23.826306894, -12.875076435), (-25.839686444, -12.875076435))
            ThreePointArc((-25.839686444, -12.875076435), (-18.29480414, -28.473524822), (-2.624129659, -35.867225003))
            Line((-2.624129659, -35.867225003), (-2.624129659, -33.856089828))
            ThreePointArc((-2.624129659, -33.856089828), (-16.880484784, -27.059380323), (-23.826306894, -12.875076435))
        make_face()
        with BuildLine():
            Line((-19.791410351, -12.875076435), (-21.810465587, -12.875076435))
            ThreePointArc((-21.810465587, -12.875076435), (-15.46613665, -25.645257634), (-2.624129659, -31.842909928))
            Line((-2.624129659, -31.842909928), (-2.624129659, -29.827062464))
            ThreePointArc((-2.624129659, -29.827062464), (-14.051747777, -24.231166485), (-19.791410351, -12.875076435))
        make_face()
        with BuildLine():
            ThreePointArc((2.625870341, -22.221343759), (8.748632168, -18.92905527), (12.165753201, -12.875076435))
            Line((12.165753201, -12.875076435), (7.546730133, -12.875076435))
            ThreePointArc((7.546730133, -12.875076435), (5.615974196, -15.80319919), (2.625870341, -17.636502301))
            Line((2.625870341, -17.636502301), (2.625870341, -22.221343759))
        make_face()
        with BuildLine():
            Line((-2.624129659, -7.125076435), (-2.624129659, -2.36365057))
            ThreePointArc((-2.624129659, -2.36365057), (-5.614233513, -4.196953681), (-7.544989451, -7.125076435))
            Line((-7.544989451, -7.125076435), (-2.624129659, -7.125076435))
        make_face()
        with BuildLine():
            Line((-2.624129659, -12.875076435), (-2.624129659, -7.125076435))
            Line((-2.624129659, -7.125076435), (-7.544989451, -7.125076435))
            ThreePointArc((-7.544989451, -7.125076435), (-8.074129659, -10.000076435), (-7.544989451, -12.875076435))
            Line((-7.544989451, -12.875076435), (-2.624129659, -12.875076435))
        make_face()
        with BuildLine():
            Line((-2.624129659, -17.636502301), (-2.624129659, -12.875076435))
            Line((-2.624129659, -12.875076435), (-7.544989451, -12.875076435))
            ThreePointArc((-7.544989451, -12.875076435), (-5.614233513, -15.80319919), (-2.624129659, -17.636502301))
        make_face()
        with BuildLine():
            Line((7.546730133, -12.875076435), (2.625870341, -12.875076435))
            Line((2.625870341, -12.875076435), (2.625870341, -17.636502301))
            ThreePointArc((2.625870341, -17.636502301), (5.615974196, -15.80319919), (7.546730133, -12.875076435))
        make_face()
        with BuildLine():
            ThreePointArc((7.546730133, -7.125076435), (5.615974196, -4.196953681), (2.625870341, -2.36365057))
            Line((2.625870341, -2.36365057), (2.625870341, -7.125076435))
            Line((2.625870341, -7.125076435), (7.546730133, -7.125076435))
        make_face()
        with BuildLine():
            Line((7.546730133, -7.125076435), (2.625870341, -7.125076435))
            Line((2.625870341, -7.125076435), (2.625870341, -12.875076435))
            Line((2.625870341, -12.875076435), (7.546730133, -12.875076435))
            ThreePointArc((7.546730133, -12.875076435), (7.942483616, -11.461720575), (8.075870341, -10.000076435))
            ThreePointArc((8.075870341, -10.000076435), (7.942483616, -8.538432296), (7.546730133, -7.125076435))
        make_face()
        with BuildLine():
            Line((2.625870341, -2.36365057), (2.625870341, 2.221190888))
            ThreePointArc((2.625870341, 2.221190888), (0.000870341, 2.499923565), (-2.624129659, 2.221190888))
            Line((-2.624129659, 2.221190888), (-2.624129659, -2.36365057))
            ThreePointArc((-2.624129659, -2.36365057), (0.000870341, -1.925076435), (2.625870341, -2.36365057))
        make_face()
        with BuildLine():
            Line((-2.624129659, -17.636502301), (-2.624129659, -22.221343759))
            ThreePointArc((-2.624129659, -22.221343759), (0.000870341, -22.500076435), (2.625870341, -22.221343759))
            Line((2.625870341, -22.221343759), (2.625870341, -17.636502301))
            ThreePointArc((2.625870341, -17.636502301), (0.000870341, -18.075076435), (-2.624129659, -17.636502301))
        make_face()
        with BuildLine():
            Line((2.625870341, -7.125076435), (2.625870341, -2.36365057))
            ThreePointArc((2.625870341, -2.36365057), (0.000870341, -1.925076435), (-2.624129659, -2.36365057))
            Line((-2.624129659, -2.36365057), (-2.624129659, -7.125076435))
            Line((-2.624129659, -7.125076435), (2.625870341, -7.125076435))
        make_face()
        with BuildLine():
            Line((2.625870341, -17.636502301), (2.625870341, -12.875076435))
            Line((2.625870341, -12.875076435), (-2.624129659, -12.875076435))
            Line((-2.624129659, -12.875076435), (-2.624129659, -17.636502301))
            ThreePointArc((-2.624129659, -17.636502301), (0.000870341, -18.075076435), (2.625870341, -17.636502301))
        make_face()
        with Locations((0.000870341, -10.000076435)):
            Rectangle(SKETCH16_W, SKETCH16_H)
    extrude(amount=-CUT_EXTRUDE9_DEPTH, mode=Mode.SUBTRACT)

    # Sketch17 → Cut-Extrude10 (cut, up to next)
    with BuildSketch(Plane(origin=(0, 0, 0), x_dir=(-1, 0, 0), z_dir=(0, 0, -1)), mode=Mode.PRIVATE) as cut_extrude10_sk1:
        with Locations((-0.000870341, -10.000076435)):
            Circle(SKETCH17_R)
    cut_extrude10_tool1 = extrude(cut_extrude10_sk1.sketch, amount=-CUT_EXTRUDE10_REACH, mode=Mode.PRIVATE) & part.part
    add(cut_extrude10_tool1.solids().sort_by_distance((0.00087, -10.000076, 0))[0], mode=Mode.SUBTRACT)

    # Sketch18 → Cut-Extrude11 (cut)
    with BuildSketch(Plane.XY.offset(15)):
        with Locations((53.408916869, -40.5)):
            Rectangle(SKETCH18_W, SKETCH18_H)
        with Locations((53.408916869, 40.5)):
            Rectangle(SKETCH18_W, SKETCH18_H)
    extrude(amount=-CUT_EXTRUDE11_DEPTH, mode=Mode.SUBTRACT)


solid = part.part
